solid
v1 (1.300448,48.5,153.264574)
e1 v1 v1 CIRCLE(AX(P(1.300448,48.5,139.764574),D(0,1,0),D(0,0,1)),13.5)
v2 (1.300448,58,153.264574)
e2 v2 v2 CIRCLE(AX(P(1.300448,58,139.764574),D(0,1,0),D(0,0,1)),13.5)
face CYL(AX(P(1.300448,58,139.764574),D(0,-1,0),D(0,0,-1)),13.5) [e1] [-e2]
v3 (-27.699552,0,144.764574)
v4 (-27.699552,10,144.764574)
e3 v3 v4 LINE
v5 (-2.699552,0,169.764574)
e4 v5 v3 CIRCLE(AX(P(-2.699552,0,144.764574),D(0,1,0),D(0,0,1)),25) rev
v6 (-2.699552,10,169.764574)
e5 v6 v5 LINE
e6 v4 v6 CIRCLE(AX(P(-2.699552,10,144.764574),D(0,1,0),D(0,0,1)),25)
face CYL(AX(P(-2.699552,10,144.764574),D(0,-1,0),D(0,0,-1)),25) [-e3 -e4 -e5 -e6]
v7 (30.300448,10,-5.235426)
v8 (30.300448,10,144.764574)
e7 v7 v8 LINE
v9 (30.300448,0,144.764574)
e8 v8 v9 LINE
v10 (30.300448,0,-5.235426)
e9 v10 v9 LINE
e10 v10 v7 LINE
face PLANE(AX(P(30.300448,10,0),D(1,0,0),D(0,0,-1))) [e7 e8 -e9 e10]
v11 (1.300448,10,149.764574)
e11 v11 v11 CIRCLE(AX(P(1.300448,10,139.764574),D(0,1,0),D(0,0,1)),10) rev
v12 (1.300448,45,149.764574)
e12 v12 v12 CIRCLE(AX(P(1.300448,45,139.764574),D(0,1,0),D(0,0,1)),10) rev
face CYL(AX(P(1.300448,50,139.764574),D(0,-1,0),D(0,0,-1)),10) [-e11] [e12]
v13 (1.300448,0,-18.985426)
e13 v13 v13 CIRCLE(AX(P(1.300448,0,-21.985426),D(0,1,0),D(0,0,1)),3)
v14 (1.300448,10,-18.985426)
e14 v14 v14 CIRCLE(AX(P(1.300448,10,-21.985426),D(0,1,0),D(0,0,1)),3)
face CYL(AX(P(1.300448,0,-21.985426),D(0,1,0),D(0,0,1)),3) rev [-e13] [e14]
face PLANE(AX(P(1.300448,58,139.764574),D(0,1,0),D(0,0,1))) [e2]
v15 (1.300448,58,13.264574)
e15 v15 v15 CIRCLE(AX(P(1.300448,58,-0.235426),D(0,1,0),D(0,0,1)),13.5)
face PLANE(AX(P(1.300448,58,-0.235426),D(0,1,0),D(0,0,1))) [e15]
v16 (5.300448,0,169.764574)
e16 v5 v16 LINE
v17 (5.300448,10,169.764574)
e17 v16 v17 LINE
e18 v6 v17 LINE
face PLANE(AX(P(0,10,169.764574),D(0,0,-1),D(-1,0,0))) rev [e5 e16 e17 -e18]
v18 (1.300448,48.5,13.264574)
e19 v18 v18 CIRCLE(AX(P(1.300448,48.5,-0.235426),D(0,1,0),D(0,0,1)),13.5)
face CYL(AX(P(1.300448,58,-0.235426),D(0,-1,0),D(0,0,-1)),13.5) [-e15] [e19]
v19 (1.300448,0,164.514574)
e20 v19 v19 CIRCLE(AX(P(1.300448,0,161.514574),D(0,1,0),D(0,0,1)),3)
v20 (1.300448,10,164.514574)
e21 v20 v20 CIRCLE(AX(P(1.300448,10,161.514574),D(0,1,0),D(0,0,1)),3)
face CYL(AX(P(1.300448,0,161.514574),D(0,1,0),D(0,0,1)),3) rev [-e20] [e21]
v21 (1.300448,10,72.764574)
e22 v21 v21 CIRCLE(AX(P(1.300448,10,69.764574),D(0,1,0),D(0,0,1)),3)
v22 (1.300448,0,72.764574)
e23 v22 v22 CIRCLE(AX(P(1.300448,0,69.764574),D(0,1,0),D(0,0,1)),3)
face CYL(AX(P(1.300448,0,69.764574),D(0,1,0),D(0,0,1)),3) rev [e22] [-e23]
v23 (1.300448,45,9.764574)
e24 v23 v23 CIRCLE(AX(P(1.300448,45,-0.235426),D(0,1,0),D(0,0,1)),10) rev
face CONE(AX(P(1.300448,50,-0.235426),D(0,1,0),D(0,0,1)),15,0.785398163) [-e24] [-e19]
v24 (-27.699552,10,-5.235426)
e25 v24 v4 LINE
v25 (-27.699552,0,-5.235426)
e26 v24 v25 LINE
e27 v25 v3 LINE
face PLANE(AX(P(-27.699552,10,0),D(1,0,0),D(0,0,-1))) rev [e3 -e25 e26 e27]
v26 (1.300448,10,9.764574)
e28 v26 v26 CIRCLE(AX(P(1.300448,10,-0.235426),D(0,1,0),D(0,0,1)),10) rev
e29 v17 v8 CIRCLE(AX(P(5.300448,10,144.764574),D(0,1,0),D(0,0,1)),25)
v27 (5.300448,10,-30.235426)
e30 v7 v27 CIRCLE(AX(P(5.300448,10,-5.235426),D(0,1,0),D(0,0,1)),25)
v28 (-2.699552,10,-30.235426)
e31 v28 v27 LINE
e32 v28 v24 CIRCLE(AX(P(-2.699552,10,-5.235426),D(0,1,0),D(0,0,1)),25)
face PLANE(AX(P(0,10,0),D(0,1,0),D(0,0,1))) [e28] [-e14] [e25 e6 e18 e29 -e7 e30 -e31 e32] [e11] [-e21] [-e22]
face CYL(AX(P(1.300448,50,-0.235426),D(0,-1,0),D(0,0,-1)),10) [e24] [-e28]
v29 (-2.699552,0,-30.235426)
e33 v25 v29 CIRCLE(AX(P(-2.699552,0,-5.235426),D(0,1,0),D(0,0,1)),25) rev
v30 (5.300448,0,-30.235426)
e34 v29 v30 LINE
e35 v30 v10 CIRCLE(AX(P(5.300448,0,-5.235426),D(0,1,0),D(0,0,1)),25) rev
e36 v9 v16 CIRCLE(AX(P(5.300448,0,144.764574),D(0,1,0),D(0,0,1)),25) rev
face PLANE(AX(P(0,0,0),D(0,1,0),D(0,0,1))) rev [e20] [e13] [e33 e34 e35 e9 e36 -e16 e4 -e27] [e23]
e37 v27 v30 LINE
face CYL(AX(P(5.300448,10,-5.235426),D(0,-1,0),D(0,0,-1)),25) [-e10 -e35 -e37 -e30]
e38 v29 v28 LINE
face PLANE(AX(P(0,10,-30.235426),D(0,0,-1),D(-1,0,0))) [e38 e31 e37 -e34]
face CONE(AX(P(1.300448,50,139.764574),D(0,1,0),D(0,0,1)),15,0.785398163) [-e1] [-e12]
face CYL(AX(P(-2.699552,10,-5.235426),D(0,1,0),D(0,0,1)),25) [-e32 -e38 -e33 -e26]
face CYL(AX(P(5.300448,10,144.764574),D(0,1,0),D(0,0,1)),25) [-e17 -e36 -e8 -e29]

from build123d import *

# Parameters (mm, degrees)
BOSS_EXTRUDE1_DEPTH = 10
BOSS_EXTRUDE2_DEPTH = 50
SKETCH3_R           = 13.5
BOSS_EXTRUDE3_DEPTH = 8
CHAMFER2_SIZE       = 5
FILLET1_R           = 25
CUT_EXTRUDE1_DEPTH  = 10


with BuildPart() as part:
    # Sketch1 → Boss-Extrude1 (new body)
    with BuildSketch(Plane(origin=(0, 0, 0), x_dir=(1, 0, 0), z_dir=(0, 1, 0))):
        with BuildLine():
            Line((30.30044843, 30.235426009), (1.30044843, 30.235426009))
            Line((1.30044843, 30.235426009), (1.30044843, 10.235426009))
            ThreePointArc((1.30044843, 10.235426009), (8.371516242, 7.306493821), (11.30044843, 0.235426009))
            ThreePointArc((11.30044843, 0.235426009), (8.371516242, -6.835641803), (1.30044843, -9.764573991))
            Line((1.30044843, -9.764573991), (1.30044843, -129.764573991))
            ThreePointArc((1.30044843, -129.764573991), (8.371516242, -132.693506179), (11.30044843, -139.764573991))
            ThreePointArc((11.30044843, -139.764573991), (8.371516242, -146.835641803), (1.30044843, -149.764573991))
            Line((1.30044843, -149.764573991), (1.30044843, -169.764573991))
            Line((1.30044843, -169.764573991), (30.30044843, -169.764573991))
            Line((30.30044843, -169.764573991), (30.30044843, 30.235426009))
        make_face()
        with BuildLine():
            Line((1.30044843, 10.235426009), (1.30044843, 30.235426009))
            Line((1.30044843, 30.235426009), (-27.69955157, 30.235426009))
            Line((-27.69955157, 30.235426009), (-27.69955157, -169.764573991))
            Line((-27.69955157, -169.764573991), (1.30044843, -169.764573991))
            Line((1.30044843, -169.764573991), (1.30044843, -149.764573991))
            ThreePointArc((1.30044843, -149.764573991), (-8.69955157, -139.764573991), (1.30044843, -129.764573991))
            Line((1.30044843, -129.764573991), (1.30044843, -9.764573991))
            ThreePointArc((1.30044843, -9.764573991), (-8.69955157, 0.235426009), (1.30044843, 10.235426009))
        make_face()
        with BuildLine():
            ThreePointArc((11.30044843, 0.235426009), (8.371516242, 7.306493821), (1.30044843, 10.235426009))
            Line((1.30044843, 10.235426009), (1.30044843, -9.764573991))
            ThreePointArc((1.30044843, -9.764573991), (8.371516242, -6.835641803), (11.30044843, 0.235426009))
        make_face()
        with BuildLine():
            Line((1.30044843, -9.764573991), (1.30044843, 10.235426009))
            ThreePointArc((1.30044843, 10.235426009), (-8.69955157, 0.235426009), (1.30044843, -9.764573991))
        make_face()
        with BuildLine():
            ThreePointArc((11.30044843, -139.764573991), (8.371516242, -132.693506179), (1.30044843, -129.764573991))
            Line((1.30044843, -129.764573991), (1.30044843, -149.764573991))
            ThreePointArc((1.30044843, -149.764573991), (8.371516242, -146.835641803), (11.30044843, -139.764573991))
        make_face()
        with BuildLine():
            Line((1.30044843, -149.764573991), (1.30044843, -129.764573991))
            ThreePointArc((1.30044843, -129.764573991), (-8.69955157, -139.764573991), (1.30044843, -149.764573991))
        make_face()
    extrude(amount=BOSS_EXTRUDE1_DEPTH)

    # Sketch1<3> → Boss-Extrude2 (add)
    with BuildSketch(Plane(origin=(0, 0, 0), x_dir=(1, 0, 0), z_dir=(0, 1, 0))):
        with BuildLine():
            ThreePointArc((11.30044843, 0.235426009), (8.371516242, 7.306493821), (1.30044843, 10.235426009))
            Line((1.30044843, 10.235426009), (1.30044843, -9.764573991))
            ThreePointArc((1.30044843, -9.764573991), (8.371516242, -6.835641803), (11.30044843, 0.235426009))
        make_face()
        with BuildLine():
            Line((1.30044843, -9.764573991), (1.30044843, 10.235426009))
            ThreePointArc((1.30044843, 10.235426009), (-8.69955157, 0.235426009), (1.30044843, -9.764573991))
        make_face()
        with BuildLine():
            ThreePointArc((11.30044843, -139.764573991), (8.371516242, -132.693506179), (1.30044843, -129.764573991))
            Line((1.30044843, -129.764573991), (1.30044843, -149.764573991))
            ThreePointArc((1.30044843, -149.764573991), (8.371516242, -146.835641803), (11.30044843, -139.764573991))
        make_face()
        with BuildLine():
            Line((1.30044843, -149.764573991), (1.30044843, -129.764573991))
            ThreePointArc((1.30044843, -129.764573991), (-8.69955157, -139.764573991), (1.30044843, -149.764573991))
        make_face()
    extrude(amount=BOSS_EXTRUDE2_DEPTH)

    # Sketch3 → Boss-Extrude3 (add)
    with BuildSketch(Plane(origin=(0, 50, 0), x_dir=(1, 0, 0), z_dir=(0, 1, 0))):
        with Locations(Location((1.30044843, -139.764573991, 0), (0, 0, 270))):
            Circle(SKETCH3_R)
        with Locations(Location((1.30044843, 0.235426009, 0), (0, 0, 270))):
            Circle(SKETCH3_R)
    extrude(amount=BOSS_EXTRUDE3_DEPTH)

    # Chamfer2
    # the kernel refuses this chamfer: 5 mm, written as the material it adds along each edge
    with BuildSketch(Plane(origin=(1.30044843, 50, -0.235426009), x_dir=(0, 0, -1), z_dir=(-1, 0, 0))) as chamfer2_piece_1_section:
        Polygon((10, CHAMFER2_SIZE), (10 + CHAMFER2_SIZE, 0), (10, 0), align=None)
    chamfer2_piece_1 = revolve(axis=Axis((1.30044843, 50, -0.235426009), (0, -1, 0)), mode=Mode.PRIVATE)
    chamfer2_piece_1 = chamfer2_piece_1 & Plane(origin=(1.30044843, 46.747090697, -0.235426009), x_dir=(0, 0, 1), z_dir=(0, -1, 0)) * Cylinder(13.5, 61, mode=Mode.PRIVATE)
    add(chamfer2_piece_1)
    with BuildSketch(Plane(origin=(1.30044843, 50, 139.764573991), x_dir=(0, 0, -1), z_dir=(-1, 0, 0))) as chamfer2_piece_2_section:
        Polygon((10 + CHAMFER2_SIZE, 0), (10, CHAMFER2_SIZE), (10, 0), align=None)
    chamfer2_piece_2 = revolve(axis=Axis((1.30044843, 50, 139.764573991), (0, -1, 0)), mode=Mode.PRIVATE)
    chamfer2_piece_2 = chamfer2_piece_2 & Plane(origin=(1.30044843, 46.747090697, 139.764573991), x_dir=(0, 0, 1), z_dir=(0, -1, 0)) * Cylinder(13.5, 60, mode=Mode.PRIVATE)
    add(chamfer2_piece_2)

    # Fillet1
    fillet1_edges = [part.edges().sort_by_distance(p)[0] for p in [
        (-27.69955157, 5, -30.235426009),
        (30.30044843, 5, -30.235426009),
        (30.30044843, 5, 169.764573991),
        (-27.69955157, 5, 169.764573991),
    ]]
    fillet(fillet1_edges, radius=FILLET1_R)

    # Sketch4 → Cut-Extrude1 (cut)
    with BuildSketch(Plane(origin=(0, 10, 0), x_dir=(1, 0, 0), z_dir=(0, 1, 0))):
        with BuildLine():
            ThreePointArc((4.30044843, 21.985426009), (3.421768774, 24.106746353), (1.30044843, 24.985426009))
            Line((1.30044843, 24.985426009), (1.30044843, 18.985426009))
            ThreePointArc((1.30044843, 18.985426009), (3.421768774, 19.864105665), (4.30044843, 21.985426009))
        make_face()
        with BuildLine():
            Line((1.30044843, 18.985426009), (1.30044843, 24.985426009))
            ThreePointArc((1.30044843, 24.985426009), (-1.69955157, 21.985426009), (1.30044843, 18.985426009))
        make_face()
        with BuildLine():
            ThreePointArc((4.30044843, -69.764573991), (3.421768774, -67.643253647), (1.30044843, -66.764573991))
            Line((1.30044843, -66.764573991), (1.30044843, -72.764573991))
            ThreePointArc((1.30044843, -72.764573991), (3.421768774, -71.885894335), (4.30044843, -69.764573991))
        make_face()
        with BuildLine():
            Line((1.30044843, -72.764573991), (1.30044843, -66.764573991))
            ThreePointArc((1.30044843, -66.764573991), (-1.69955157, -69.764573991), (1.30044843, -72.764573991))
        make_face()
        with BuildLine():
            ThreePointArc((4.30044843, -161.514573991), (3.421768774, -159.393253647), (1.30044843, -158.514573991))
            Line((1.30044843, -158.514573991), (1.30044843, -164.514573991))
            ThreePointArc((1.30044843, -164.514573991), (3.421768774, -163.635894335), (4.30044843, -161.514573991))
        make_face()
        with BuildLine():
            Line((1.30044843, -164.514573991), (1.30044843, -158.514573991))
            ThreePointArc((1.30044843, -158.514573991), (-1.69955157, -161.514573991), (1.30044843, -164.514573991))
        make_face()
    extrude(amount=-CUT_EXTRUDE1_DEPTH, mode=Mode.SUBTRACT)


solid = part.part
